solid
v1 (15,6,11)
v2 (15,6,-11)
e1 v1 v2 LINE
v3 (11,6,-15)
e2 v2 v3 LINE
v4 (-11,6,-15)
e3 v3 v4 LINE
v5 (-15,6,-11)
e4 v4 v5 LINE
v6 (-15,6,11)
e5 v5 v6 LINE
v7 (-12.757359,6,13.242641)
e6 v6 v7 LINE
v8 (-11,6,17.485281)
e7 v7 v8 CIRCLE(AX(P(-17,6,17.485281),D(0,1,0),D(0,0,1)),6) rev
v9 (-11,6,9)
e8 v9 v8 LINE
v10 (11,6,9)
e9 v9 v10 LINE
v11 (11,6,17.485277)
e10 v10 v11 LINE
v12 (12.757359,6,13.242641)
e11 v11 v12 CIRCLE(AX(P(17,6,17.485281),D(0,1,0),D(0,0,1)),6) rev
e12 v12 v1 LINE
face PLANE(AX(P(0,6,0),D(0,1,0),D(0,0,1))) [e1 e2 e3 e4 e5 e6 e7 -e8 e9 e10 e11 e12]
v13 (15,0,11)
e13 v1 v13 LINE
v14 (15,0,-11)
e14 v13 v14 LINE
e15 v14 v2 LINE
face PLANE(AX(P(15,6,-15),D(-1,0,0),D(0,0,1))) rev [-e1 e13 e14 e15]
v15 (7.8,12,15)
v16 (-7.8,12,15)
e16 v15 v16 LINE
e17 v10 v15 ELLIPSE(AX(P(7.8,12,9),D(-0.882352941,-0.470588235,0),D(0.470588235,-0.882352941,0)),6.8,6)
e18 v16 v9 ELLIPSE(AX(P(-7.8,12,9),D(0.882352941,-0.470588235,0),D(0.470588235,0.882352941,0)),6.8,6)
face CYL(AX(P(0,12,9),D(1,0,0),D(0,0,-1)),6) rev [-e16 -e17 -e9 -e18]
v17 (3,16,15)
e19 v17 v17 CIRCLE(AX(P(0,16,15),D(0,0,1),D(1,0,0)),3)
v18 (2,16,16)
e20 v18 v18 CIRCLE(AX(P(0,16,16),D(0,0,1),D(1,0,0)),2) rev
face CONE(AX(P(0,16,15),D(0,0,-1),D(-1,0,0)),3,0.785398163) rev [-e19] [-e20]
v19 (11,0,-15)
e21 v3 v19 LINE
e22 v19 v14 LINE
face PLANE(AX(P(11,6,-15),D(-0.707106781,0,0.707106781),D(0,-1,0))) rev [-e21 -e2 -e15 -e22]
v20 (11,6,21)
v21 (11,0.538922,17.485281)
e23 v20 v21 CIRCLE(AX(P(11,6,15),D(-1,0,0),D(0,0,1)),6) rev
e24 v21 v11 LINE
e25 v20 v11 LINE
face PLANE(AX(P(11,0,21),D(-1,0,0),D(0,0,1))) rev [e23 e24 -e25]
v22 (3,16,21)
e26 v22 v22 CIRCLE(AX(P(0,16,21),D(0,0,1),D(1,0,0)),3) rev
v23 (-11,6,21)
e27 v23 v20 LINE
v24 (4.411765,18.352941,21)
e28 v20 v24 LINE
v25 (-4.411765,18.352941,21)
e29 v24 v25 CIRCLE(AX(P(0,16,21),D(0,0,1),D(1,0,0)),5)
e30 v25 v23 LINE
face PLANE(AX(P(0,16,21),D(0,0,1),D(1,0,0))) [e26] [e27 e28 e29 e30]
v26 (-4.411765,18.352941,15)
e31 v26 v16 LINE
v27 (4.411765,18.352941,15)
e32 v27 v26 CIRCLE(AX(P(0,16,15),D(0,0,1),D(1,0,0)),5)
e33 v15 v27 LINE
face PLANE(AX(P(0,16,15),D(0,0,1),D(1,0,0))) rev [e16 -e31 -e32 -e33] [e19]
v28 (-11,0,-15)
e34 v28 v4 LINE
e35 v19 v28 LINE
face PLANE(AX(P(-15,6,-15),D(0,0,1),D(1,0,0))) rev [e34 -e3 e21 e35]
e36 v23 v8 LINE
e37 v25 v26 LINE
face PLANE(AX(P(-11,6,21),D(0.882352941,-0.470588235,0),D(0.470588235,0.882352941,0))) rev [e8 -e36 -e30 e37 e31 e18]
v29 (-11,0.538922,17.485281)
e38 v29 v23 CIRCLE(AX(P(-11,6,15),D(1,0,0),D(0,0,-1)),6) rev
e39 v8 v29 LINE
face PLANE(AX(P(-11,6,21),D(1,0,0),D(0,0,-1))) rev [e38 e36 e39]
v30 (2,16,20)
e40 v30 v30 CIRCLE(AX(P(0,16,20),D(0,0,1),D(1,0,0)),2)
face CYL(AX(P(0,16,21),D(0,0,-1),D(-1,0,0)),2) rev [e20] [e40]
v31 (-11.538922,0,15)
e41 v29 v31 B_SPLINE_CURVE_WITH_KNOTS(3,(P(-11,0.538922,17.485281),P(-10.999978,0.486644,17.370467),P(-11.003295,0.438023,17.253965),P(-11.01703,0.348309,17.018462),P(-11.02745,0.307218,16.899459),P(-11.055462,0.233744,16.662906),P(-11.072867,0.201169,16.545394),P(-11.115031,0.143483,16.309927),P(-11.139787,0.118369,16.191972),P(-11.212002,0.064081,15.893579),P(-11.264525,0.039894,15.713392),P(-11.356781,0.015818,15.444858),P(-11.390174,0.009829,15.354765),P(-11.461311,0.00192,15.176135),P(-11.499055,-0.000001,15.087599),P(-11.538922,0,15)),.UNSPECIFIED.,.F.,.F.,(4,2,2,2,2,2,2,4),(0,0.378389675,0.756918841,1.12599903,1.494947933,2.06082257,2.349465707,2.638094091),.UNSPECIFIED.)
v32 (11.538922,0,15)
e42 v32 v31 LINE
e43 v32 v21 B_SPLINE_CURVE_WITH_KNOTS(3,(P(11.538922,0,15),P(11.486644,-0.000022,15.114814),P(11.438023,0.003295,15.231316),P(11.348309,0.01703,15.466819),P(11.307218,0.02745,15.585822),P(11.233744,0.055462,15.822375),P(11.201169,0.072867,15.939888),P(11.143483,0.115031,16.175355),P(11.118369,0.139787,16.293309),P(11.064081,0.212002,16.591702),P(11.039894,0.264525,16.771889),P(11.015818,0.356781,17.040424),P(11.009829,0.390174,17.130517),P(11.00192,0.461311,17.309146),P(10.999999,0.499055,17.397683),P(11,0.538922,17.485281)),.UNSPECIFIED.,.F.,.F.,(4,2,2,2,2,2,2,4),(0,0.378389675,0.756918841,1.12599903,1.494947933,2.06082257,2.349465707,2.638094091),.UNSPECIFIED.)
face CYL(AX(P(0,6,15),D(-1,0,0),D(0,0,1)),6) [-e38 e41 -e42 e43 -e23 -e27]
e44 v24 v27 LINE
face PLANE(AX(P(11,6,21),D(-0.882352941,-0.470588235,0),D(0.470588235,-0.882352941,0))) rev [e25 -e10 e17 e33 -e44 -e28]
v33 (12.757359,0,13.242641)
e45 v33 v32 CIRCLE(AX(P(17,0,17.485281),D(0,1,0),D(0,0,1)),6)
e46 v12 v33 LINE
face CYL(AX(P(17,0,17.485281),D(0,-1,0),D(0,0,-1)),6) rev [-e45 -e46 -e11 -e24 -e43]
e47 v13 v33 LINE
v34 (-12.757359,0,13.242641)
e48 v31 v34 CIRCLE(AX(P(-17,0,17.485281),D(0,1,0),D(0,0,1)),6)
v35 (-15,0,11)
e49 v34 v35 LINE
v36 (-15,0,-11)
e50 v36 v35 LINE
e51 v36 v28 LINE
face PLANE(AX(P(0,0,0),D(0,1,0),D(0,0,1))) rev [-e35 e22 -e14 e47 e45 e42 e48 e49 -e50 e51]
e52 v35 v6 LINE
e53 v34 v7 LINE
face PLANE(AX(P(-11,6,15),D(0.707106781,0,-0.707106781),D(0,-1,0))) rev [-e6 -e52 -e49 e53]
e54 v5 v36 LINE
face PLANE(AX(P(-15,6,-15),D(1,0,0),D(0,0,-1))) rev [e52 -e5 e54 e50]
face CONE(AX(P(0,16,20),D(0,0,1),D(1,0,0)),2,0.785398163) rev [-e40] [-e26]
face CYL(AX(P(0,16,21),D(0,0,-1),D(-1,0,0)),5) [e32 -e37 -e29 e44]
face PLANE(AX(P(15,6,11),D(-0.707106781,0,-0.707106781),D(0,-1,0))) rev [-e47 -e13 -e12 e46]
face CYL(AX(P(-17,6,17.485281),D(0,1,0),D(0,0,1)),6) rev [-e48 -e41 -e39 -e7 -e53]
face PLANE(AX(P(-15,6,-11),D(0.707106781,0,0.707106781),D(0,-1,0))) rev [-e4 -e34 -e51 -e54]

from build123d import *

# Parameters (mm, degrees)
SKETCH_1_W      = 30
SKETCH_1_H      = 30
EXTRUDE_1_DEPTH = 6
CHAMFER_1_SIZE  = 4
SKETCH_2_R      = 2
EXTRUDE_2_DEPTH = 6
FILLET_1_R      = 6
FILLET_2_R      = 6
FILLET_3_R      = 6
CHAMFER_2_SIZE  = 1


with BuildPart() as part:
    # 草图1 → 凸台-拉伸1 (new body)
    with BuildSketch(Plane(origin=(0, 0, 0), x_dir=(1, 0, 0), z_dir=(0, 1, 0))):
        Rectangle(SKETCH_1_W, SKETCH_1_H)
    extrude(amount=EXTRUDE_1_DEPTH)

    # 倒角1
    chamfer_1_edges = [part.edges().sort_by_distance(p)[0] for p in [
        (15, 3, 15),
        (-15, 3, 15),
        (-15, 3, -15),
        (15, 3, -15),
    ]]
    chamfer(chamfer_1_edges, length=CHAMFER_1_SIZE)

    # 草图2 → 凸台-拉伸2 (add)
    with BuildSketch(Plane.XY.offset(15)):
        with BuildLine():
            Line((-11, 6), (-4.411764706, 18.352941176))
            ThreePointArc((-4.411764706, 18.352941176), (0, 21), (4.411764706, 18.352941176))
            Line((4.411764706, 18.352941176), (11, 6))
            Line((11, 6), (11, 0))
            Line((11, 0), (-11, 0))
            Line((-11, 0), (-11, 6))
        make_face()
        with Locations((0, 16)):
            Circle(SKETCH_2_R, mode=Mode.SUBTRACT)
    extrude(amount=EXTRUDE_2_DEPTH)

    # 圆角1
    fillet_1_edges = [part.edges().sort_by_distance(p)[0] for p in [
        (0, 0, 21),
    ]]
    fillet(fillet_1_edges, radius=FILLET_1_R)

    # 圆角2
    # the kernel refuses this fillet: 6 mm, written as the material it adds along each edge
    with BuildSketch(Plane(origin=(-11, 0, 15), x_dir=(-0.7071067811865481, 0, -0.7071067811865467), z_dir=(0, 1, 0))) as fillet_2_piece_1_section:
        with BuildLine():
            CenterArc((FILLET_2_R * 0.414213562373, FILLET_2_R), FILLET_2_R, 225, 45)
            Line((-FILLET_2_R * 0.292893218813, FILLET_2_R * 0.292893218813), (0, 0))
            Line((0, 0), (FILLET_2_R * 0.414213562373, 0))
        make_face()
    fillet_2_piece_1 = extrude(amount=6, mode=Mode.PRIVATE)
    fillet_2_piece_1 = split(fillet_2_piece_1, bisect_by=Plane(origin=(-11.980240057, 0.038623377, 15), z_dir=(0, 0, -1)), keep=Keep.TOP, mode=Mode.PRIVATE)
    add(fillet_2_piece_1)
    with BuildSketch(Plane(origin=(-11, -6.213203436, 15), x_dir=(-0.7071067811865482, 0, -0.7071067811865468), z_dir=(0, 1, 0))) as fillet_2_piece_2_section:
        with BuildLine():
            CenterArc((FILLET_2_R * 0.414213562373, FILLET_2_R), FILLET_2_R, 225, 45)
            Line((-FILLET_2_R * 0.292893218813, FILLET_2_R * 0.292893218813), (0, 0))
            Line((0, 0), (FILLET_2_R * 0.414213562373, 0))
        make_face()
    fillet_2_piece_2 = extrude(amount=12.213203436, mode=Mode.PRIVATE)
    fillet_2_piece_2 = fillet_2_piece_2 & Plane(origin=(-11.156065336, 6, 15), x_dir=(0, -1, 0), z_dir=(-1, 0, 0)) * Cylinder(6, 35, mode=Mode.PRIVATE)
    add(fillet_2_piece_2)
    with BuildSketch(Plane(origin=(11, 0, 15), x_dir=(0.7071067811865482, 0, -0.7071067811865468), z_dir=(0, 1, 0))) as fillet_2_piece_3_section:
        with BuildLine():
            CenterArc((FILLET_2_R * 0.414213562373, -FILLET_2_R), FILLET_2_R, 90, 45)
            Line((-FILLET_2_R * 0.292893218813, -FILLET_2_R * 0.292893218813), (0, 0))
            Line((0, 0), (FILLET_2_R * 0.414213562373, 0))
        make_face()
    fillet_2_piece_3 = extrude(amount=6, mode=Mode.PRIVATE)
    fillet_2_piece_3 = split(fillet_2_piece_3, bisect_by=Plane(origin=(11.980240057, 0.038623377, 15), z_dir=(0, 0, -1)), keep=Keep.TOP, mode=Mode.PRIVATE)
    add(fillet_2_piece_3)
    with BuildSketch(Plane(origin=(11, -6.213203436, 15), x_dir=(0.7071067811865476, 0, -0.7071067811865476), z_dir=(0, 1, 0))) as fillet_2_piece_4_section:
        with BuildLine():
            CenterArc((FILLET_2_R * 0.414213562373, -FILLET_2_R), FILLET_2_R, 90, 45)
            Line((-FILLET_2_R * 0.292893218813, -FILLET_2_R * 0.292893218813), (0, 0))
            Line((0, 0), (FILLET_2_R * 0.414213562373, 0))
        make_face()
    fillet_2_piece_4 = extrude(amount=12.213203436, mode=Mode.PRIVATE)
    fillet_2_piece_4 = fillet_2_piece_4 & Plane(origin=(11.156065336, 6, 15), x_dir=(0, -1, 0), z_dir=(-1, 0, 0)) * Cylinder(6, 35, mode=Mode.PRIVATE)
    add(fillet_2_piece_4)

    # 圆角3
    fillet_3_edges = [part.edges().sort_by_distance(p)[0] for p in [
        (0, 6, 15),
    ]]
    fillet(fillet_3_edges, radius=FILLET_3_R)

    # 倒角2
    chamfer_2_edges = [part.edges().sort_by_distance(p)[0] for p in [
        (-2, 16, 15),
        (-2, 16, 21),
    ]]
    chamfer(chamfer_2_edges, length=CHAMFER_2_SIZE)


solid = part.part
